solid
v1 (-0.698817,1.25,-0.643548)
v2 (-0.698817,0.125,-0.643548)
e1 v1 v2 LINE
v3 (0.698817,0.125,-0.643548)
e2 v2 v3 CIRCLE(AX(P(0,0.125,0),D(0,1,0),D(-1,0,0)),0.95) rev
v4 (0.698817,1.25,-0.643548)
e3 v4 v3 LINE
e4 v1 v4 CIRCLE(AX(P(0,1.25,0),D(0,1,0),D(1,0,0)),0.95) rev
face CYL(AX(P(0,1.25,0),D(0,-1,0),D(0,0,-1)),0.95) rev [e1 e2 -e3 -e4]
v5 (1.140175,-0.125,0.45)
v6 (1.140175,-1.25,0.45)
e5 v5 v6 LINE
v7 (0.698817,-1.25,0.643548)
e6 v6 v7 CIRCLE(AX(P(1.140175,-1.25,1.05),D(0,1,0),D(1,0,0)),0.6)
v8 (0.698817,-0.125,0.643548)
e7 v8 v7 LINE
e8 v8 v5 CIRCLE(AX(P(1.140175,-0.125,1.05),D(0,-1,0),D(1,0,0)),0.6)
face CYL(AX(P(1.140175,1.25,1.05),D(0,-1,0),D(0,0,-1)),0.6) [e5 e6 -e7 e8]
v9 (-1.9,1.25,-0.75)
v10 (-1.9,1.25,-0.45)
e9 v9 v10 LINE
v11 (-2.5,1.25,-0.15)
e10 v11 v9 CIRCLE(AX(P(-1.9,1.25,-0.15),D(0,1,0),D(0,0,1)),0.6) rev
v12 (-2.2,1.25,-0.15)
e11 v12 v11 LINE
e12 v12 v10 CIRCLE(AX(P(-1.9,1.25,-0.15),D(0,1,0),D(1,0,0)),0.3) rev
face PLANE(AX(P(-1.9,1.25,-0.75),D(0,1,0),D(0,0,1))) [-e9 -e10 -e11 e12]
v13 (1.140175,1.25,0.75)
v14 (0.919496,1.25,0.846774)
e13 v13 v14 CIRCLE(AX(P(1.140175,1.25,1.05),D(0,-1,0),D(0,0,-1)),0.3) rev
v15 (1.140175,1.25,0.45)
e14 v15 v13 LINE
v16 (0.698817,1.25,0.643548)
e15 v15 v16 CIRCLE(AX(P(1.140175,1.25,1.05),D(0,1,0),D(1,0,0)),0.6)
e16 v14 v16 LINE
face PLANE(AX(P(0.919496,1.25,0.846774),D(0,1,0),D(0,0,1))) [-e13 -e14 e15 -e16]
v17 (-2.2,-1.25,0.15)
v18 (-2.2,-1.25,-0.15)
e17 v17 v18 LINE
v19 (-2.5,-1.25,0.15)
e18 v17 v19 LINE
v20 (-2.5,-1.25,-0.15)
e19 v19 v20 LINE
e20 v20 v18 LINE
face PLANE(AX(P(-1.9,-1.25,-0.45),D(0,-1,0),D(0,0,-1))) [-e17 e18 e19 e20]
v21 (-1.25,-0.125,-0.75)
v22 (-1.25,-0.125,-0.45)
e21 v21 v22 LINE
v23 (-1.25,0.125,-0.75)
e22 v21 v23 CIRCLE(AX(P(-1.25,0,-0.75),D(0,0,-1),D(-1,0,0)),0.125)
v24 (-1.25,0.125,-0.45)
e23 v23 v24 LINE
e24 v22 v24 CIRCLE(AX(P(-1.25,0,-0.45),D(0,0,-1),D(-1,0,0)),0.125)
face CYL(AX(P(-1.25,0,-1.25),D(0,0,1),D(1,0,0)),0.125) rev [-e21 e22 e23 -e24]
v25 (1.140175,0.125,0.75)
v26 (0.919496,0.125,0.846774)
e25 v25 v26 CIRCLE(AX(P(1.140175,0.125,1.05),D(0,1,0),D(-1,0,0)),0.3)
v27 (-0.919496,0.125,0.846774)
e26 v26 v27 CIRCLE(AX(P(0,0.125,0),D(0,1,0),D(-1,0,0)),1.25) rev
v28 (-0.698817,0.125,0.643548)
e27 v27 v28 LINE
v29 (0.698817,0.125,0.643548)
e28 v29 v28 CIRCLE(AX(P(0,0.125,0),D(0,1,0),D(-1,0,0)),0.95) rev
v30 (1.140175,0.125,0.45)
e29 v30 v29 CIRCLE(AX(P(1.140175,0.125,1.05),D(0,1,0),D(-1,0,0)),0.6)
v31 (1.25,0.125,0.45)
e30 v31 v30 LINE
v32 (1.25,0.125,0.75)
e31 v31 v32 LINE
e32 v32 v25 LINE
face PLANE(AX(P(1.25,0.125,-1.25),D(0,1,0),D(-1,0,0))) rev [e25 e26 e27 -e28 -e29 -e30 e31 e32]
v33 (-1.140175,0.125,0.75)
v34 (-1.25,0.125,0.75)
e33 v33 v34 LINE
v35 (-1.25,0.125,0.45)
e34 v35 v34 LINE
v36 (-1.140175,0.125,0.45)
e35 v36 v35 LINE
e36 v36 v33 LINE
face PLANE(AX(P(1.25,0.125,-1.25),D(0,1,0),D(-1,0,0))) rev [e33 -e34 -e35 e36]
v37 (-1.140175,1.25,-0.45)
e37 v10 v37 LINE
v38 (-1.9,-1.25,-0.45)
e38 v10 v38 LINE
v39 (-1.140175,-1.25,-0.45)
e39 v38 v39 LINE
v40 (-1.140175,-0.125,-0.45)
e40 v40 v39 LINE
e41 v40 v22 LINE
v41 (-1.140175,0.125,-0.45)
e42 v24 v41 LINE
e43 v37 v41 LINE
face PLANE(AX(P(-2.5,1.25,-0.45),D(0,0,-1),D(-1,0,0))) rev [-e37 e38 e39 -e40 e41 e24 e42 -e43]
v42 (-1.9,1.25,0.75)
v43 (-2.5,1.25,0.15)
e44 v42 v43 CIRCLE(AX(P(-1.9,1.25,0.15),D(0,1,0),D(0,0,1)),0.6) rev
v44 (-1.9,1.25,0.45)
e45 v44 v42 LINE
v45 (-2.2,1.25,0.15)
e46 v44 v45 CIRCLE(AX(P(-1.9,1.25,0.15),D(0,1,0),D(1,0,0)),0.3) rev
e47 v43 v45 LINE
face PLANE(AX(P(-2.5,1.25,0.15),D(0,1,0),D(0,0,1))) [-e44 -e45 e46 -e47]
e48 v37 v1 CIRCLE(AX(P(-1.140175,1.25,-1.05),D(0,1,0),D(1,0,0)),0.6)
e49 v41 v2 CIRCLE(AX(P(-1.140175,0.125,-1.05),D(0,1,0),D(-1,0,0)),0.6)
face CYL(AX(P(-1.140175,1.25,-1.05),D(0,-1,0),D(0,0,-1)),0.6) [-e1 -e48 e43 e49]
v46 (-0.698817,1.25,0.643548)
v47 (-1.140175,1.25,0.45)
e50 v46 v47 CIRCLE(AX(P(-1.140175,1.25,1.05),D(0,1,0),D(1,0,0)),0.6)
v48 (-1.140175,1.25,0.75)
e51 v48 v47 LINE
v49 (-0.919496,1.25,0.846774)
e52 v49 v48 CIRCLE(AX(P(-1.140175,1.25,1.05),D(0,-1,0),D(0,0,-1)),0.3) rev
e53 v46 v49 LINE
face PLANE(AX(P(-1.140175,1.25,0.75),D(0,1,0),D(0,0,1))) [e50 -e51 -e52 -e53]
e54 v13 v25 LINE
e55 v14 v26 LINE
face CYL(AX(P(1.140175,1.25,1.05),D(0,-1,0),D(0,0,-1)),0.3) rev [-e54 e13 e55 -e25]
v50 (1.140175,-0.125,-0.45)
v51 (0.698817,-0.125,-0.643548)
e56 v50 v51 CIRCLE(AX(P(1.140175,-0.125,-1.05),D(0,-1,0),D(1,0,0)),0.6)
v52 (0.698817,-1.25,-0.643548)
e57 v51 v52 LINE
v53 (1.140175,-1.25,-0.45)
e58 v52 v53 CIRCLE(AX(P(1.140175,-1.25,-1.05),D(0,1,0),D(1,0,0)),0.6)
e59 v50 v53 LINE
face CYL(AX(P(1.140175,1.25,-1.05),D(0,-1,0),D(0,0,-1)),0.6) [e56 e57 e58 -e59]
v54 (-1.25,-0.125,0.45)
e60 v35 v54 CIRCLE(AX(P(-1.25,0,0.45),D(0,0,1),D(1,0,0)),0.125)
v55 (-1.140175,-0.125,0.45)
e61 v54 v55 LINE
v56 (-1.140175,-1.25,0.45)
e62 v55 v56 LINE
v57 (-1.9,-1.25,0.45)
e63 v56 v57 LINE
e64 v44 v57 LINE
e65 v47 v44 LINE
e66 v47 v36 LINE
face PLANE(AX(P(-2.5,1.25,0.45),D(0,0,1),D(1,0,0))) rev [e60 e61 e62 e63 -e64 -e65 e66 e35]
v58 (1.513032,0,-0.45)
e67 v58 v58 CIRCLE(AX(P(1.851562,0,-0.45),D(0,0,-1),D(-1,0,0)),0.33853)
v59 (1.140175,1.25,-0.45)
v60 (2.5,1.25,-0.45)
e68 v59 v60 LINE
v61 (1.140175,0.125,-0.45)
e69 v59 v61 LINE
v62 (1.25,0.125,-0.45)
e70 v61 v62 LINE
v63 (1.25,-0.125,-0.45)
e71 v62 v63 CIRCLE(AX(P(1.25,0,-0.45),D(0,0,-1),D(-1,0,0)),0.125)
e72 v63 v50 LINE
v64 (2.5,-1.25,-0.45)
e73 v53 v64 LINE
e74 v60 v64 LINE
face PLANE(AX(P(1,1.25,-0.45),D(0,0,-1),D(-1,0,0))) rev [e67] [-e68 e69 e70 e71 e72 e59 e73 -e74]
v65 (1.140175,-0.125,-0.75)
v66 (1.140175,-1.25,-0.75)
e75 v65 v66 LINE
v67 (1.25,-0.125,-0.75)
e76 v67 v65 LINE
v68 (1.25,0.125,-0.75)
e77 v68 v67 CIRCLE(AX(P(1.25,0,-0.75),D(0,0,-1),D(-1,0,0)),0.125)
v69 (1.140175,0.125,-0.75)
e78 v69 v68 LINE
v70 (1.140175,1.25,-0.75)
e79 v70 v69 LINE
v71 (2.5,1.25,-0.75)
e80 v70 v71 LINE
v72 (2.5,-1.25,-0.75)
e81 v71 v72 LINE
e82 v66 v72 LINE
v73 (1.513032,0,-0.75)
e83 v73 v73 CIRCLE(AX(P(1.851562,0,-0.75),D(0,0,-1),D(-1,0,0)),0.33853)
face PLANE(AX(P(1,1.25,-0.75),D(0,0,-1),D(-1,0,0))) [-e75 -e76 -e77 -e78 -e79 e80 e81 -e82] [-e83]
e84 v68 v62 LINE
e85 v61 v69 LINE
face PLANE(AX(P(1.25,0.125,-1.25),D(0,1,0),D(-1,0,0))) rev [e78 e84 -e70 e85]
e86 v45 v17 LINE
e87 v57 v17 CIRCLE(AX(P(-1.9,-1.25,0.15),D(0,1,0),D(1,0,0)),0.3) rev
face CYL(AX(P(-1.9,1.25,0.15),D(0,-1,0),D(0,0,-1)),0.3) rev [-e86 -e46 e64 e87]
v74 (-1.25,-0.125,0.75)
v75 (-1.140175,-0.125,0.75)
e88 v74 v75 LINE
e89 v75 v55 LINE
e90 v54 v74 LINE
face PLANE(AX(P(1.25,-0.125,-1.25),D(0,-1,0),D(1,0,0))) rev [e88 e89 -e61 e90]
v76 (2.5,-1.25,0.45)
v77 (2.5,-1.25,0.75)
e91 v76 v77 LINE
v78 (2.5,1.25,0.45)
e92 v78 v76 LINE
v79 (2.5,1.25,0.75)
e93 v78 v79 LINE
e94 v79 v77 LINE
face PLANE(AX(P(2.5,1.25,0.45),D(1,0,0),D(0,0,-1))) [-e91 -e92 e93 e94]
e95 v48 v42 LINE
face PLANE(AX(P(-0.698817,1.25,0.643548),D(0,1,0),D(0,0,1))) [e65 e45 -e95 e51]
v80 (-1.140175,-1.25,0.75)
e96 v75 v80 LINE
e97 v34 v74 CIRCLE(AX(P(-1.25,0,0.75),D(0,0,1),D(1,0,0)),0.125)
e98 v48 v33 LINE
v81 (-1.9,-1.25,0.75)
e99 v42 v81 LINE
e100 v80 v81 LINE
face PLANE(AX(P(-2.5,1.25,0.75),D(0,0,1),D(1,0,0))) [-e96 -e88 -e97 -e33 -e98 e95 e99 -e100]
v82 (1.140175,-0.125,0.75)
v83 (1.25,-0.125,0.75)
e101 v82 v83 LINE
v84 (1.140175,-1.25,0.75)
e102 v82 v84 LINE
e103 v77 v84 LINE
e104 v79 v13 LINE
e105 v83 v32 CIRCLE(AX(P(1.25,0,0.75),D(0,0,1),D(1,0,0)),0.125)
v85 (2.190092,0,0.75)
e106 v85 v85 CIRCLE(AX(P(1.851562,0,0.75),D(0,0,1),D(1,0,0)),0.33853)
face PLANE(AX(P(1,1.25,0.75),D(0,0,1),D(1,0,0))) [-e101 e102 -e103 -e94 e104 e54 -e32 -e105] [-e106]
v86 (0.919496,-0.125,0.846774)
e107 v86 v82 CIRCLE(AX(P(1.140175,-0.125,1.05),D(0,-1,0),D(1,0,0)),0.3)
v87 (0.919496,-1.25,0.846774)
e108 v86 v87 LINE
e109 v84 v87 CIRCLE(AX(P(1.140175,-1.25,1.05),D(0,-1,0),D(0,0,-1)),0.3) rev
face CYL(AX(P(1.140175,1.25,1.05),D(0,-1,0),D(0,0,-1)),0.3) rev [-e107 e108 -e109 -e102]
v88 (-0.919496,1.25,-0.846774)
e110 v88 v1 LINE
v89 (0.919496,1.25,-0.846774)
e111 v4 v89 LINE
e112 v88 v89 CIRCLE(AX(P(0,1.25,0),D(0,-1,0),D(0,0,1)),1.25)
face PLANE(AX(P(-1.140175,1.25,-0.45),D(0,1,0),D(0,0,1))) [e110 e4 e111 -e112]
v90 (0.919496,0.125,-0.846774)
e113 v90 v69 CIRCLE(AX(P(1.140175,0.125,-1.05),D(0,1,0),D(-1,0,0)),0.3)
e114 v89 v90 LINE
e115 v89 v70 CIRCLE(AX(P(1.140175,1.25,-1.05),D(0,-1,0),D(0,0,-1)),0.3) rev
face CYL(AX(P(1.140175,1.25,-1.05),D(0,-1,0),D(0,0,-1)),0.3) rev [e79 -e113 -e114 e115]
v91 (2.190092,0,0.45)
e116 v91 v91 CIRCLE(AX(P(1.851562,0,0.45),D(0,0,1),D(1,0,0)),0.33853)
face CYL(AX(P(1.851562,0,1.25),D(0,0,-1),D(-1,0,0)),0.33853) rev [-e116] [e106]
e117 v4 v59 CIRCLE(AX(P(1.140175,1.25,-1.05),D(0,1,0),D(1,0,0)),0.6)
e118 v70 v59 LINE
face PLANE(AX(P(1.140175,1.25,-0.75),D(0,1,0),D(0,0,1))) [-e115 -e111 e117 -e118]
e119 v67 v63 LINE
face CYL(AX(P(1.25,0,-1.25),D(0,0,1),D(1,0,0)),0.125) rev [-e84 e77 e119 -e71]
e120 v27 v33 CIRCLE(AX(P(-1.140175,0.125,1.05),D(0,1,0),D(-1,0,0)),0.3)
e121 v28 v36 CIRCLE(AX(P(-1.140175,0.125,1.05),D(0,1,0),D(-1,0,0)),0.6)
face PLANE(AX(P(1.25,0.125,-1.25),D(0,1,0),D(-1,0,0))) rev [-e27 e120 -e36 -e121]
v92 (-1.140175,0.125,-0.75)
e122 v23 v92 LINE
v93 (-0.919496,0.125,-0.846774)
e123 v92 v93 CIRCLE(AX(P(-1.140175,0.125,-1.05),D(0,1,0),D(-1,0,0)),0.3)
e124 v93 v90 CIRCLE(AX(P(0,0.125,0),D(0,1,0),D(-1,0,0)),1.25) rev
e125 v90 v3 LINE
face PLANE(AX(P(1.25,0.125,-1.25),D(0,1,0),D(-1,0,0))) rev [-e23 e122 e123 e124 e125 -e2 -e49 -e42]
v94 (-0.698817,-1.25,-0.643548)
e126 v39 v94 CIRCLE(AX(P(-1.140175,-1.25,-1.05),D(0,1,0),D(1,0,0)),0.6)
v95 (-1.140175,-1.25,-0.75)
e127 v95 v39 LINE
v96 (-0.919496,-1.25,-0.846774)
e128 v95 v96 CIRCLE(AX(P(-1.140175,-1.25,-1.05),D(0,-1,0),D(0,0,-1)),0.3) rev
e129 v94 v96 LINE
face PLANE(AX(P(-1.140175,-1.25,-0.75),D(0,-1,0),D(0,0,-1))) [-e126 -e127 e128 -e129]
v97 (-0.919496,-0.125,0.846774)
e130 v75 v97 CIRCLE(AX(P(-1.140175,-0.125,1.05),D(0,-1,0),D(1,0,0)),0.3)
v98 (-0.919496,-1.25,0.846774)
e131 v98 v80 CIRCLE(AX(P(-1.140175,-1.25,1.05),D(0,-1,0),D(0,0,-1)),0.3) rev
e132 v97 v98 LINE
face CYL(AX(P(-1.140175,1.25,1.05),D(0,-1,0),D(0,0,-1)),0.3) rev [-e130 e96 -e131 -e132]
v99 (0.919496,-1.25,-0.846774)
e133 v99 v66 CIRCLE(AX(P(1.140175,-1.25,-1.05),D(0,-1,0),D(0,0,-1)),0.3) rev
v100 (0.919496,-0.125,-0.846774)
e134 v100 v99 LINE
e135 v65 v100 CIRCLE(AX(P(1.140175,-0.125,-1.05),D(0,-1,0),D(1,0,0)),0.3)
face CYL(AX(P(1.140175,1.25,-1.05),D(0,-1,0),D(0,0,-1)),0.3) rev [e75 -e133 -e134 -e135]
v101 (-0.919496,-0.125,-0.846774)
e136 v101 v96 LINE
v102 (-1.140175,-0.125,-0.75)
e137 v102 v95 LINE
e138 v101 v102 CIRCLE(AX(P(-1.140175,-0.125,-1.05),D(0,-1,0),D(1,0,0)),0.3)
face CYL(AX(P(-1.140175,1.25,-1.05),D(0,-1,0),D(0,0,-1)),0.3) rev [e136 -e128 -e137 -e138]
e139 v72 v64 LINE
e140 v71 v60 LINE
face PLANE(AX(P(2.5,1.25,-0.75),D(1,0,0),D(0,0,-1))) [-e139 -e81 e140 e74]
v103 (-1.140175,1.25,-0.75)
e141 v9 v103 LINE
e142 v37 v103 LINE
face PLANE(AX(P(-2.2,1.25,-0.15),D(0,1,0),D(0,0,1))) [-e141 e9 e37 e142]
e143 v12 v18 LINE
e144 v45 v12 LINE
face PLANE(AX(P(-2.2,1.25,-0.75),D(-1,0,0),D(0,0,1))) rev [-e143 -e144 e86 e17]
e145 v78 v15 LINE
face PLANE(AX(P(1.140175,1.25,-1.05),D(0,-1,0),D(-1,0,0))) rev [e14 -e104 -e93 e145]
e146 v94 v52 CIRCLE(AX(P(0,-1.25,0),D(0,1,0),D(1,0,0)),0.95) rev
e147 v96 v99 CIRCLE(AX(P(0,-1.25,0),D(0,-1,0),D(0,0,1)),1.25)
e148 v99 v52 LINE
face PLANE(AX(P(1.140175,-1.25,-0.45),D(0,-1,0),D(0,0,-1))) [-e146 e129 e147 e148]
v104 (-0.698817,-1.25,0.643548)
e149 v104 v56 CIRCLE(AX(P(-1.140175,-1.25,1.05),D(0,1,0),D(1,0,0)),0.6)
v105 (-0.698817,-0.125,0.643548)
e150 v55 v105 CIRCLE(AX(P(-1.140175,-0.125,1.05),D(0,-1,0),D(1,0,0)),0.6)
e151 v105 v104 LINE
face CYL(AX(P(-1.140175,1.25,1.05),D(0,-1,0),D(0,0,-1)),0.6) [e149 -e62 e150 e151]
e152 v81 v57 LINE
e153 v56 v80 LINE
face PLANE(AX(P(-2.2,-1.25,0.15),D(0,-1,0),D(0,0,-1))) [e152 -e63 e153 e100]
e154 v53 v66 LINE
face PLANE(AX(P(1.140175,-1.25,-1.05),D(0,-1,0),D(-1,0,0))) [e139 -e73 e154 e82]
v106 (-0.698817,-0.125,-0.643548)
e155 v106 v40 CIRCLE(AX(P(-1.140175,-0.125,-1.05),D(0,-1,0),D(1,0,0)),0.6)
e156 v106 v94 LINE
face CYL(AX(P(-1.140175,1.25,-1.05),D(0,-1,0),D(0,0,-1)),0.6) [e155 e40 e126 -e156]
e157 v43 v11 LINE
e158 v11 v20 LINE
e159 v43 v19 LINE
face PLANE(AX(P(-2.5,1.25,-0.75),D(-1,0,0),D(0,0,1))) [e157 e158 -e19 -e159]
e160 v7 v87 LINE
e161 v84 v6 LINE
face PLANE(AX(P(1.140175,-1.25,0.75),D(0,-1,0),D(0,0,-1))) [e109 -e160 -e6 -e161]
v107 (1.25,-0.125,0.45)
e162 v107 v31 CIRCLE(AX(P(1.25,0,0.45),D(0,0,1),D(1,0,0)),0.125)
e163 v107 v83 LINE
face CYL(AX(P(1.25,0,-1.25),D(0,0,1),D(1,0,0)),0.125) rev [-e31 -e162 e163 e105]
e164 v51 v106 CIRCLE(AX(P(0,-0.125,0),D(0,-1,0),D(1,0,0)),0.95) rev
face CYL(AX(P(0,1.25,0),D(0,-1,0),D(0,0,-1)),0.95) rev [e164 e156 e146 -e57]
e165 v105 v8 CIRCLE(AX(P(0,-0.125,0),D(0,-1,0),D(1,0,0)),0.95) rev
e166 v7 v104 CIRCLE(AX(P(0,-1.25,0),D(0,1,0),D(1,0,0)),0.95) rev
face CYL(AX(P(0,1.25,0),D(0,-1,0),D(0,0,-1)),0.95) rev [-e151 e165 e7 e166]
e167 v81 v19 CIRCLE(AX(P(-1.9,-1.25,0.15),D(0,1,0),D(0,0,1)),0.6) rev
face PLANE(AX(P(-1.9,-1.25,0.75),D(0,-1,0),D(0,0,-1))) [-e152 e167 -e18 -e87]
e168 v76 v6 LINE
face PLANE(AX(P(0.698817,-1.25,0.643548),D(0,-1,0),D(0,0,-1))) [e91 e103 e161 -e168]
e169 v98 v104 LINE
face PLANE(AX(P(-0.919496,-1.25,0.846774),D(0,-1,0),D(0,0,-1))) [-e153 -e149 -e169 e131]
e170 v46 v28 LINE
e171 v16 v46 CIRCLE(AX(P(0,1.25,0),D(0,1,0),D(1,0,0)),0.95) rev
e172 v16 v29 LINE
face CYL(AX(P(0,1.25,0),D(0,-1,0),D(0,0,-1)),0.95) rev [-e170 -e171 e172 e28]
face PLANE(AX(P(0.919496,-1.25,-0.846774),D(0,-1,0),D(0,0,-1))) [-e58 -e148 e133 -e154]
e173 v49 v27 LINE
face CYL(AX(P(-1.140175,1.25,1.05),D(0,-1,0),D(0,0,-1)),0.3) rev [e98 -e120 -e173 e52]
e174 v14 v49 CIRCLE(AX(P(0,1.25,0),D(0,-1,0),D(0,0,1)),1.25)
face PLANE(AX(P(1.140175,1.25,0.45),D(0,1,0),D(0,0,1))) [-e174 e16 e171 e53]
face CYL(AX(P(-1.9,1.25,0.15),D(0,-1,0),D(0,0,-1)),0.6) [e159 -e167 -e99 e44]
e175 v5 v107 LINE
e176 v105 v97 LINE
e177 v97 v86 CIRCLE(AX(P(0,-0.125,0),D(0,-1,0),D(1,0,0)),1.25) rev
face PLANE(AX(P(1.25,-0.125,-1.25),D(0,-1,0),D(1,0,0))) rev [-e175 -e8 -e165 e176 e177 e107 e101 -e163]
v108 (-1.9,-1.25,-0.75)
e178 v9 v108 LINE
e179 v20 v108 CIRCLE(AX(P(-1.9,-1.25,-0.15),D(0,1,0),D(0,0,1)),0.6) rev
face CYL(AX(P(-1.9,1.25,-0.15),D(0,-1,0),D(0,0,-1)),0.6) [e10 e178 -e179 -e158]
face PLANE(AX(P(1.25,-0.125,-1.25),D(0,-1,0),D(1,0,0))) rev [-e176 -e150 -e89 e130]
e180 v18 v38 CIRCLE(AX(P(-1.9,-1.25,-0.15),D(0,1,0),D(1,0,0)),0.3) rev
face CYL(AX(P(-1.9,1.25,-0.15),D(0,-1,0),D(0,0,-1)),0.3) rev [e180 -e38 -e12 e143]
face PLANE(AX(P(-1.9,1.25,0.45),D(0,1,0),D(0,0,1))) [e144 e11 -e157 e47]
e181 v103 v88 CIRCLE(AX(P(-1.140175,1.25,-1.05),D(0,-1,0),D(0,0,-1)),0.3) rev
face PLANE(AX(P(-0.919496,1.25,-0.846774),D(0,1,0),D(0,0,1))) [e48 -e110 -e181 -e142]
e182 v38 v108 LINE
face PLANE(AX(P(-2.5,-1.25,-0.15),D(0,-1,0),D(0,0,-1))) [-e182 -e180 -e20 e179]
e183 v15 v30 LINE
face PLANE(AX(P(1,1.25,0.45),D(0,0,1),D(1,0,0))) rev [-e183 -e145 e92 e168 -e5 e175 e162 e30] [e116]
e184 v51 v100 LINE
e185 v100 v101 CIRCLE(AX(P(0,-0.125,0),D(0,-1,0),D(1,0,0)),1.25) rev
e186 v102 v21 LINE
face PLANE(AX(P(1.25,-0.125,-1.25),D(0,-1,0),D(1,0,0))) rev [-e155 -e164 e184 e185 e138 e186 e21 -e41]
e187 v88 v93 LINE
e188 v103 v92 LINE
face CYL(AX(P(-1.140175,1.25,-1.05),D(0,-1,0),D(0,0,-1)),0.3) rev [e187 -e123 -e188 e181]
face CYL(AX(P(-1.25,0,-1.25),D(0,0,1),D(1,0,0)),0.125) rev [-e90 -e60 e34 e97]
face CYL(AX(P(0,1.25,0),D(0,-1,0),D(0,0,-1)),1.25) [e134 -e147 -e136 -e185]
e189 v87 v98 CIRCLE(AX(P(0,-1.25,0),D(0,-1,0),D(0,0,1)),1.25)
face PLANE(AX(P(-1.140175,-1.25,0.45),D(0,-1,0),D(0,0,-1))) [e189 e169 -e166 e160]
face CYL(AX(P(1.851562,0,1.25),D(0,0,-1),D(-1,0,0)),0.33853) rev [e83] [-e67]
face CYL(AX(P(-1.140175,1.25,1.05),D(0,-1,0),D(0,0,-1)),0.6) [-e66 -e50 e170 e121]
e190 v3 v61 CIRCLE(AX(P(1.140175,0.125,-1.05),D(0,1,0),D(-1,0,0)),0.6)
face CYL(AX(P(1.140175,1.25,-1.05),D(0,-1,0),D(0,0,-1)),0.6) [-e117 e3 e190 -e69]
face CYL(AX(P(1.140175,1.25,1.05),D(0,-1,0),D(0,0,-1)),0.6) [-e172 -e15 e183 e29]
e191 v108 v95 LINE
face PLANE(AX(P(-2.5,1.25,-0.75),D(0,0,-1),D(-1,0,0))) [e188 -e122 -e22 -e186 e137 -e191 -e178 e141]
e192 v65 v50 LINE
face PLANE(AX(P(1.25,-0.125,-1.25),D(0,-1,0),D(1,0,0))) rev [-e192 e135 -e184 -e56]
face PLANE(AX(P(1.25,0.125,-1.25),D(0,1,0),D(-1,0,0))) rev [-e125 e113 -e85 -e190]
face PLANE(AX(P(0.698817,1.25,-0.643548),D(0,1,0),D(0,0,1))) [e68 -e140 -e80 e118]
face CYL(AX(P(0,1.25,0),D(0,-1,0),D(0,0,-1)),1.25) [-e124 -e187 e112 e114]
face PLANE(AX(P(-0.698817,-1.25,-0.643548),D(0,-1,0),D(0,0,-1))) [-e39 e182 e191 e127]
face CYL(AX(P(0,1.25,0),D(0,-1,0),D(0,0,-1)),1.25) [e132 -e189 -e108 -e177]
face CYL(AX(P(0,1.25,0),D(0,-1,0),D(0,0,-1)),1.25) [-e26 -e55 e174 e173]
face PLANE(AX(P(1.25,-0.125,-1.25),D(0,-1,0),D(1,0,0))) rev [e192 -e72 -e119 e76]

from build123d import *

# Parameters (mm, degrees)
BASE_FLANGE1_START      = -1.25
BASE_FLANGE1_DEPTH      = 2.5
SKETCH6_R               = 0.338529601
CUT_EXTRUDE1_DEPTH      = 4.436931771
CUT_EXTRUDE2_DEPTH      = 4.436931771
CUT_EXTRUDE2_DEPTH_BACK = 4.436931771


# Read off the part's stored shape, not the designer's step: Base-Flange1
with BuildPart() as part:
    # Base-Flange1 outline → Base-Flange1 (new body)
    with BuildSketch(Plane(origin=(0, 0, 0), x_dir=(1, 0, 0), z_dir=(0, 1, 0)).offset(BASE_FLANGE1_START)):
        with BuildLine():
            Line((1.140175425, 0.45), (2.5, 0.45))
            Line((2.5, 0.45), (2.5, 0.75))
            Line((2.5, 0.75), (1.140175425, 0.75))
            ThreePointArc((1.140175425, 0.75), (1.019692526, 0.775256718), (0.919496311, 0.846774194))
            ThreePointArc((0.919496311, 0.846774194), (0, 1.25), (-0.919496311, 0.846774194))
            ThreePointArc((-0.919496311, 0.846774194), (-1.019692526, 0.775256718), (-1.140175425, 0.75))
            Line((-1.140175425, 0.75), (-1.9, 0.75))
            ThreePointArc((-1.9, 0.75), (-2.324264069, 0.574264069), (-2.5, 0.15))
            Line((-2.5, 0.15), (-2.5, -0.15))
            ThreePointArc((-2.5, -0.15), (-2.324264069, -0.574264069), (-1.9, -0.75))
            Line((-1.9, -0.75), (-1.140175425, -0.75))
            ThreePointArc((-1.140175425, -0.75), (-1.019692526, -0.775256718), (-0.919496311, -0.846774194))
            ThreePointArc((-0.919496311, -0.846774194), (0, -1.25), (0.919496311, -0.846774194))
            ThreePointArc((0.919496311, -0.846774194), (1.019692526, -0.775256718), (1.140175425, -0.75))
            Line((1.140175425, -0.75), (2.5, -0.75))
            Line((2.5, -0.75), (2.5, -0.45))
            Line((2.5, -0.45), (1.140175425, -0.45))
            ThreePointArc((1.140175425, -0.45), (0.899209626, -0.500513436), (0.698817196, -0.643548387))
            ThreePointArc((0.698817196, -0.643548387), (0, -0.95), (-0.698817196, -0.643548387))
            ThreePointArc((-0.698817196, -0.643548387), (-0.899209626, -0.500513436), (-1.140175425, -0.45))
            Line((-1.140175425, -0.45), (-1.9, -0.45))
            ThreePointArc((-1.9, -0.45), (-2.112132034, -0.362132034), (-2.2, -0.15))
            Line((-2.2, -0.15), (-2.2, 0.15))
            ThreePointArc((-2.2, 0.15), (-2.112132034, 0.362132034), (-1.9, 0.45))
            Line((-1.9, 0.45), (-1.140175425, 0.45))
            ThreePointArc((-1.140175425, 0.45), (-0.899209626, 0.500513436), (-0.698817196, 0.643548387))
            ThreePointArc((-0.698817196, 0.643548387), (0, 0.95), (0.698817196, 0.643548387))
            ThreePointArc((0.698817196, 0.643548387), (0.899209626, 0.500513436), (1.140175425, 0.45))
        make_face()
    extrude(amount=BASE_FLANGE1_DEPTH)

    # Sketch6 → Cut-Extrude1 (cut, through all)
    with BuildSketch(Plane(origin=(0, 0, -0.75), x_dir=(-1, 0, 0), z_dir=(0, 0, -1))):
        with Locations(Location((-1.851561926, 0, 0), (0, 0, 180))):
            Circle(SKETCH6_R)
    extrude(amount=-CUT_EXTRUDE1_DEPTH, mode=Mode.SUBTRACT)

    # Sketch7 → Cut-Extrude2 (cut, two sides: drawn at the far end of the back side and taken through both)
    with BuildSketch(Plane.XY.offset(0.75).offset(-CUT_EXTRUDE2_DEPTH_BACK)):
        with BuildLine():
            Line((1.25, -0.125), (-1.25, -0.125))
            ThreePointArc((-1.25, -0.125), (-1.375, 0), (-1.25, 0.125))
            Line((-1.25, 0.125), (1.25, 0.125))
            ThreePointArc((1.25, 0.125), (1.375, 0), (1.25, -0.125))
        make_face()
    extrude(amount=CUT_EXTRUDE2_DEPTH + CUT_EXTRUDE2_DEPTH_BACK, mode=Mode.SUBTRACT)


solid = part.part
